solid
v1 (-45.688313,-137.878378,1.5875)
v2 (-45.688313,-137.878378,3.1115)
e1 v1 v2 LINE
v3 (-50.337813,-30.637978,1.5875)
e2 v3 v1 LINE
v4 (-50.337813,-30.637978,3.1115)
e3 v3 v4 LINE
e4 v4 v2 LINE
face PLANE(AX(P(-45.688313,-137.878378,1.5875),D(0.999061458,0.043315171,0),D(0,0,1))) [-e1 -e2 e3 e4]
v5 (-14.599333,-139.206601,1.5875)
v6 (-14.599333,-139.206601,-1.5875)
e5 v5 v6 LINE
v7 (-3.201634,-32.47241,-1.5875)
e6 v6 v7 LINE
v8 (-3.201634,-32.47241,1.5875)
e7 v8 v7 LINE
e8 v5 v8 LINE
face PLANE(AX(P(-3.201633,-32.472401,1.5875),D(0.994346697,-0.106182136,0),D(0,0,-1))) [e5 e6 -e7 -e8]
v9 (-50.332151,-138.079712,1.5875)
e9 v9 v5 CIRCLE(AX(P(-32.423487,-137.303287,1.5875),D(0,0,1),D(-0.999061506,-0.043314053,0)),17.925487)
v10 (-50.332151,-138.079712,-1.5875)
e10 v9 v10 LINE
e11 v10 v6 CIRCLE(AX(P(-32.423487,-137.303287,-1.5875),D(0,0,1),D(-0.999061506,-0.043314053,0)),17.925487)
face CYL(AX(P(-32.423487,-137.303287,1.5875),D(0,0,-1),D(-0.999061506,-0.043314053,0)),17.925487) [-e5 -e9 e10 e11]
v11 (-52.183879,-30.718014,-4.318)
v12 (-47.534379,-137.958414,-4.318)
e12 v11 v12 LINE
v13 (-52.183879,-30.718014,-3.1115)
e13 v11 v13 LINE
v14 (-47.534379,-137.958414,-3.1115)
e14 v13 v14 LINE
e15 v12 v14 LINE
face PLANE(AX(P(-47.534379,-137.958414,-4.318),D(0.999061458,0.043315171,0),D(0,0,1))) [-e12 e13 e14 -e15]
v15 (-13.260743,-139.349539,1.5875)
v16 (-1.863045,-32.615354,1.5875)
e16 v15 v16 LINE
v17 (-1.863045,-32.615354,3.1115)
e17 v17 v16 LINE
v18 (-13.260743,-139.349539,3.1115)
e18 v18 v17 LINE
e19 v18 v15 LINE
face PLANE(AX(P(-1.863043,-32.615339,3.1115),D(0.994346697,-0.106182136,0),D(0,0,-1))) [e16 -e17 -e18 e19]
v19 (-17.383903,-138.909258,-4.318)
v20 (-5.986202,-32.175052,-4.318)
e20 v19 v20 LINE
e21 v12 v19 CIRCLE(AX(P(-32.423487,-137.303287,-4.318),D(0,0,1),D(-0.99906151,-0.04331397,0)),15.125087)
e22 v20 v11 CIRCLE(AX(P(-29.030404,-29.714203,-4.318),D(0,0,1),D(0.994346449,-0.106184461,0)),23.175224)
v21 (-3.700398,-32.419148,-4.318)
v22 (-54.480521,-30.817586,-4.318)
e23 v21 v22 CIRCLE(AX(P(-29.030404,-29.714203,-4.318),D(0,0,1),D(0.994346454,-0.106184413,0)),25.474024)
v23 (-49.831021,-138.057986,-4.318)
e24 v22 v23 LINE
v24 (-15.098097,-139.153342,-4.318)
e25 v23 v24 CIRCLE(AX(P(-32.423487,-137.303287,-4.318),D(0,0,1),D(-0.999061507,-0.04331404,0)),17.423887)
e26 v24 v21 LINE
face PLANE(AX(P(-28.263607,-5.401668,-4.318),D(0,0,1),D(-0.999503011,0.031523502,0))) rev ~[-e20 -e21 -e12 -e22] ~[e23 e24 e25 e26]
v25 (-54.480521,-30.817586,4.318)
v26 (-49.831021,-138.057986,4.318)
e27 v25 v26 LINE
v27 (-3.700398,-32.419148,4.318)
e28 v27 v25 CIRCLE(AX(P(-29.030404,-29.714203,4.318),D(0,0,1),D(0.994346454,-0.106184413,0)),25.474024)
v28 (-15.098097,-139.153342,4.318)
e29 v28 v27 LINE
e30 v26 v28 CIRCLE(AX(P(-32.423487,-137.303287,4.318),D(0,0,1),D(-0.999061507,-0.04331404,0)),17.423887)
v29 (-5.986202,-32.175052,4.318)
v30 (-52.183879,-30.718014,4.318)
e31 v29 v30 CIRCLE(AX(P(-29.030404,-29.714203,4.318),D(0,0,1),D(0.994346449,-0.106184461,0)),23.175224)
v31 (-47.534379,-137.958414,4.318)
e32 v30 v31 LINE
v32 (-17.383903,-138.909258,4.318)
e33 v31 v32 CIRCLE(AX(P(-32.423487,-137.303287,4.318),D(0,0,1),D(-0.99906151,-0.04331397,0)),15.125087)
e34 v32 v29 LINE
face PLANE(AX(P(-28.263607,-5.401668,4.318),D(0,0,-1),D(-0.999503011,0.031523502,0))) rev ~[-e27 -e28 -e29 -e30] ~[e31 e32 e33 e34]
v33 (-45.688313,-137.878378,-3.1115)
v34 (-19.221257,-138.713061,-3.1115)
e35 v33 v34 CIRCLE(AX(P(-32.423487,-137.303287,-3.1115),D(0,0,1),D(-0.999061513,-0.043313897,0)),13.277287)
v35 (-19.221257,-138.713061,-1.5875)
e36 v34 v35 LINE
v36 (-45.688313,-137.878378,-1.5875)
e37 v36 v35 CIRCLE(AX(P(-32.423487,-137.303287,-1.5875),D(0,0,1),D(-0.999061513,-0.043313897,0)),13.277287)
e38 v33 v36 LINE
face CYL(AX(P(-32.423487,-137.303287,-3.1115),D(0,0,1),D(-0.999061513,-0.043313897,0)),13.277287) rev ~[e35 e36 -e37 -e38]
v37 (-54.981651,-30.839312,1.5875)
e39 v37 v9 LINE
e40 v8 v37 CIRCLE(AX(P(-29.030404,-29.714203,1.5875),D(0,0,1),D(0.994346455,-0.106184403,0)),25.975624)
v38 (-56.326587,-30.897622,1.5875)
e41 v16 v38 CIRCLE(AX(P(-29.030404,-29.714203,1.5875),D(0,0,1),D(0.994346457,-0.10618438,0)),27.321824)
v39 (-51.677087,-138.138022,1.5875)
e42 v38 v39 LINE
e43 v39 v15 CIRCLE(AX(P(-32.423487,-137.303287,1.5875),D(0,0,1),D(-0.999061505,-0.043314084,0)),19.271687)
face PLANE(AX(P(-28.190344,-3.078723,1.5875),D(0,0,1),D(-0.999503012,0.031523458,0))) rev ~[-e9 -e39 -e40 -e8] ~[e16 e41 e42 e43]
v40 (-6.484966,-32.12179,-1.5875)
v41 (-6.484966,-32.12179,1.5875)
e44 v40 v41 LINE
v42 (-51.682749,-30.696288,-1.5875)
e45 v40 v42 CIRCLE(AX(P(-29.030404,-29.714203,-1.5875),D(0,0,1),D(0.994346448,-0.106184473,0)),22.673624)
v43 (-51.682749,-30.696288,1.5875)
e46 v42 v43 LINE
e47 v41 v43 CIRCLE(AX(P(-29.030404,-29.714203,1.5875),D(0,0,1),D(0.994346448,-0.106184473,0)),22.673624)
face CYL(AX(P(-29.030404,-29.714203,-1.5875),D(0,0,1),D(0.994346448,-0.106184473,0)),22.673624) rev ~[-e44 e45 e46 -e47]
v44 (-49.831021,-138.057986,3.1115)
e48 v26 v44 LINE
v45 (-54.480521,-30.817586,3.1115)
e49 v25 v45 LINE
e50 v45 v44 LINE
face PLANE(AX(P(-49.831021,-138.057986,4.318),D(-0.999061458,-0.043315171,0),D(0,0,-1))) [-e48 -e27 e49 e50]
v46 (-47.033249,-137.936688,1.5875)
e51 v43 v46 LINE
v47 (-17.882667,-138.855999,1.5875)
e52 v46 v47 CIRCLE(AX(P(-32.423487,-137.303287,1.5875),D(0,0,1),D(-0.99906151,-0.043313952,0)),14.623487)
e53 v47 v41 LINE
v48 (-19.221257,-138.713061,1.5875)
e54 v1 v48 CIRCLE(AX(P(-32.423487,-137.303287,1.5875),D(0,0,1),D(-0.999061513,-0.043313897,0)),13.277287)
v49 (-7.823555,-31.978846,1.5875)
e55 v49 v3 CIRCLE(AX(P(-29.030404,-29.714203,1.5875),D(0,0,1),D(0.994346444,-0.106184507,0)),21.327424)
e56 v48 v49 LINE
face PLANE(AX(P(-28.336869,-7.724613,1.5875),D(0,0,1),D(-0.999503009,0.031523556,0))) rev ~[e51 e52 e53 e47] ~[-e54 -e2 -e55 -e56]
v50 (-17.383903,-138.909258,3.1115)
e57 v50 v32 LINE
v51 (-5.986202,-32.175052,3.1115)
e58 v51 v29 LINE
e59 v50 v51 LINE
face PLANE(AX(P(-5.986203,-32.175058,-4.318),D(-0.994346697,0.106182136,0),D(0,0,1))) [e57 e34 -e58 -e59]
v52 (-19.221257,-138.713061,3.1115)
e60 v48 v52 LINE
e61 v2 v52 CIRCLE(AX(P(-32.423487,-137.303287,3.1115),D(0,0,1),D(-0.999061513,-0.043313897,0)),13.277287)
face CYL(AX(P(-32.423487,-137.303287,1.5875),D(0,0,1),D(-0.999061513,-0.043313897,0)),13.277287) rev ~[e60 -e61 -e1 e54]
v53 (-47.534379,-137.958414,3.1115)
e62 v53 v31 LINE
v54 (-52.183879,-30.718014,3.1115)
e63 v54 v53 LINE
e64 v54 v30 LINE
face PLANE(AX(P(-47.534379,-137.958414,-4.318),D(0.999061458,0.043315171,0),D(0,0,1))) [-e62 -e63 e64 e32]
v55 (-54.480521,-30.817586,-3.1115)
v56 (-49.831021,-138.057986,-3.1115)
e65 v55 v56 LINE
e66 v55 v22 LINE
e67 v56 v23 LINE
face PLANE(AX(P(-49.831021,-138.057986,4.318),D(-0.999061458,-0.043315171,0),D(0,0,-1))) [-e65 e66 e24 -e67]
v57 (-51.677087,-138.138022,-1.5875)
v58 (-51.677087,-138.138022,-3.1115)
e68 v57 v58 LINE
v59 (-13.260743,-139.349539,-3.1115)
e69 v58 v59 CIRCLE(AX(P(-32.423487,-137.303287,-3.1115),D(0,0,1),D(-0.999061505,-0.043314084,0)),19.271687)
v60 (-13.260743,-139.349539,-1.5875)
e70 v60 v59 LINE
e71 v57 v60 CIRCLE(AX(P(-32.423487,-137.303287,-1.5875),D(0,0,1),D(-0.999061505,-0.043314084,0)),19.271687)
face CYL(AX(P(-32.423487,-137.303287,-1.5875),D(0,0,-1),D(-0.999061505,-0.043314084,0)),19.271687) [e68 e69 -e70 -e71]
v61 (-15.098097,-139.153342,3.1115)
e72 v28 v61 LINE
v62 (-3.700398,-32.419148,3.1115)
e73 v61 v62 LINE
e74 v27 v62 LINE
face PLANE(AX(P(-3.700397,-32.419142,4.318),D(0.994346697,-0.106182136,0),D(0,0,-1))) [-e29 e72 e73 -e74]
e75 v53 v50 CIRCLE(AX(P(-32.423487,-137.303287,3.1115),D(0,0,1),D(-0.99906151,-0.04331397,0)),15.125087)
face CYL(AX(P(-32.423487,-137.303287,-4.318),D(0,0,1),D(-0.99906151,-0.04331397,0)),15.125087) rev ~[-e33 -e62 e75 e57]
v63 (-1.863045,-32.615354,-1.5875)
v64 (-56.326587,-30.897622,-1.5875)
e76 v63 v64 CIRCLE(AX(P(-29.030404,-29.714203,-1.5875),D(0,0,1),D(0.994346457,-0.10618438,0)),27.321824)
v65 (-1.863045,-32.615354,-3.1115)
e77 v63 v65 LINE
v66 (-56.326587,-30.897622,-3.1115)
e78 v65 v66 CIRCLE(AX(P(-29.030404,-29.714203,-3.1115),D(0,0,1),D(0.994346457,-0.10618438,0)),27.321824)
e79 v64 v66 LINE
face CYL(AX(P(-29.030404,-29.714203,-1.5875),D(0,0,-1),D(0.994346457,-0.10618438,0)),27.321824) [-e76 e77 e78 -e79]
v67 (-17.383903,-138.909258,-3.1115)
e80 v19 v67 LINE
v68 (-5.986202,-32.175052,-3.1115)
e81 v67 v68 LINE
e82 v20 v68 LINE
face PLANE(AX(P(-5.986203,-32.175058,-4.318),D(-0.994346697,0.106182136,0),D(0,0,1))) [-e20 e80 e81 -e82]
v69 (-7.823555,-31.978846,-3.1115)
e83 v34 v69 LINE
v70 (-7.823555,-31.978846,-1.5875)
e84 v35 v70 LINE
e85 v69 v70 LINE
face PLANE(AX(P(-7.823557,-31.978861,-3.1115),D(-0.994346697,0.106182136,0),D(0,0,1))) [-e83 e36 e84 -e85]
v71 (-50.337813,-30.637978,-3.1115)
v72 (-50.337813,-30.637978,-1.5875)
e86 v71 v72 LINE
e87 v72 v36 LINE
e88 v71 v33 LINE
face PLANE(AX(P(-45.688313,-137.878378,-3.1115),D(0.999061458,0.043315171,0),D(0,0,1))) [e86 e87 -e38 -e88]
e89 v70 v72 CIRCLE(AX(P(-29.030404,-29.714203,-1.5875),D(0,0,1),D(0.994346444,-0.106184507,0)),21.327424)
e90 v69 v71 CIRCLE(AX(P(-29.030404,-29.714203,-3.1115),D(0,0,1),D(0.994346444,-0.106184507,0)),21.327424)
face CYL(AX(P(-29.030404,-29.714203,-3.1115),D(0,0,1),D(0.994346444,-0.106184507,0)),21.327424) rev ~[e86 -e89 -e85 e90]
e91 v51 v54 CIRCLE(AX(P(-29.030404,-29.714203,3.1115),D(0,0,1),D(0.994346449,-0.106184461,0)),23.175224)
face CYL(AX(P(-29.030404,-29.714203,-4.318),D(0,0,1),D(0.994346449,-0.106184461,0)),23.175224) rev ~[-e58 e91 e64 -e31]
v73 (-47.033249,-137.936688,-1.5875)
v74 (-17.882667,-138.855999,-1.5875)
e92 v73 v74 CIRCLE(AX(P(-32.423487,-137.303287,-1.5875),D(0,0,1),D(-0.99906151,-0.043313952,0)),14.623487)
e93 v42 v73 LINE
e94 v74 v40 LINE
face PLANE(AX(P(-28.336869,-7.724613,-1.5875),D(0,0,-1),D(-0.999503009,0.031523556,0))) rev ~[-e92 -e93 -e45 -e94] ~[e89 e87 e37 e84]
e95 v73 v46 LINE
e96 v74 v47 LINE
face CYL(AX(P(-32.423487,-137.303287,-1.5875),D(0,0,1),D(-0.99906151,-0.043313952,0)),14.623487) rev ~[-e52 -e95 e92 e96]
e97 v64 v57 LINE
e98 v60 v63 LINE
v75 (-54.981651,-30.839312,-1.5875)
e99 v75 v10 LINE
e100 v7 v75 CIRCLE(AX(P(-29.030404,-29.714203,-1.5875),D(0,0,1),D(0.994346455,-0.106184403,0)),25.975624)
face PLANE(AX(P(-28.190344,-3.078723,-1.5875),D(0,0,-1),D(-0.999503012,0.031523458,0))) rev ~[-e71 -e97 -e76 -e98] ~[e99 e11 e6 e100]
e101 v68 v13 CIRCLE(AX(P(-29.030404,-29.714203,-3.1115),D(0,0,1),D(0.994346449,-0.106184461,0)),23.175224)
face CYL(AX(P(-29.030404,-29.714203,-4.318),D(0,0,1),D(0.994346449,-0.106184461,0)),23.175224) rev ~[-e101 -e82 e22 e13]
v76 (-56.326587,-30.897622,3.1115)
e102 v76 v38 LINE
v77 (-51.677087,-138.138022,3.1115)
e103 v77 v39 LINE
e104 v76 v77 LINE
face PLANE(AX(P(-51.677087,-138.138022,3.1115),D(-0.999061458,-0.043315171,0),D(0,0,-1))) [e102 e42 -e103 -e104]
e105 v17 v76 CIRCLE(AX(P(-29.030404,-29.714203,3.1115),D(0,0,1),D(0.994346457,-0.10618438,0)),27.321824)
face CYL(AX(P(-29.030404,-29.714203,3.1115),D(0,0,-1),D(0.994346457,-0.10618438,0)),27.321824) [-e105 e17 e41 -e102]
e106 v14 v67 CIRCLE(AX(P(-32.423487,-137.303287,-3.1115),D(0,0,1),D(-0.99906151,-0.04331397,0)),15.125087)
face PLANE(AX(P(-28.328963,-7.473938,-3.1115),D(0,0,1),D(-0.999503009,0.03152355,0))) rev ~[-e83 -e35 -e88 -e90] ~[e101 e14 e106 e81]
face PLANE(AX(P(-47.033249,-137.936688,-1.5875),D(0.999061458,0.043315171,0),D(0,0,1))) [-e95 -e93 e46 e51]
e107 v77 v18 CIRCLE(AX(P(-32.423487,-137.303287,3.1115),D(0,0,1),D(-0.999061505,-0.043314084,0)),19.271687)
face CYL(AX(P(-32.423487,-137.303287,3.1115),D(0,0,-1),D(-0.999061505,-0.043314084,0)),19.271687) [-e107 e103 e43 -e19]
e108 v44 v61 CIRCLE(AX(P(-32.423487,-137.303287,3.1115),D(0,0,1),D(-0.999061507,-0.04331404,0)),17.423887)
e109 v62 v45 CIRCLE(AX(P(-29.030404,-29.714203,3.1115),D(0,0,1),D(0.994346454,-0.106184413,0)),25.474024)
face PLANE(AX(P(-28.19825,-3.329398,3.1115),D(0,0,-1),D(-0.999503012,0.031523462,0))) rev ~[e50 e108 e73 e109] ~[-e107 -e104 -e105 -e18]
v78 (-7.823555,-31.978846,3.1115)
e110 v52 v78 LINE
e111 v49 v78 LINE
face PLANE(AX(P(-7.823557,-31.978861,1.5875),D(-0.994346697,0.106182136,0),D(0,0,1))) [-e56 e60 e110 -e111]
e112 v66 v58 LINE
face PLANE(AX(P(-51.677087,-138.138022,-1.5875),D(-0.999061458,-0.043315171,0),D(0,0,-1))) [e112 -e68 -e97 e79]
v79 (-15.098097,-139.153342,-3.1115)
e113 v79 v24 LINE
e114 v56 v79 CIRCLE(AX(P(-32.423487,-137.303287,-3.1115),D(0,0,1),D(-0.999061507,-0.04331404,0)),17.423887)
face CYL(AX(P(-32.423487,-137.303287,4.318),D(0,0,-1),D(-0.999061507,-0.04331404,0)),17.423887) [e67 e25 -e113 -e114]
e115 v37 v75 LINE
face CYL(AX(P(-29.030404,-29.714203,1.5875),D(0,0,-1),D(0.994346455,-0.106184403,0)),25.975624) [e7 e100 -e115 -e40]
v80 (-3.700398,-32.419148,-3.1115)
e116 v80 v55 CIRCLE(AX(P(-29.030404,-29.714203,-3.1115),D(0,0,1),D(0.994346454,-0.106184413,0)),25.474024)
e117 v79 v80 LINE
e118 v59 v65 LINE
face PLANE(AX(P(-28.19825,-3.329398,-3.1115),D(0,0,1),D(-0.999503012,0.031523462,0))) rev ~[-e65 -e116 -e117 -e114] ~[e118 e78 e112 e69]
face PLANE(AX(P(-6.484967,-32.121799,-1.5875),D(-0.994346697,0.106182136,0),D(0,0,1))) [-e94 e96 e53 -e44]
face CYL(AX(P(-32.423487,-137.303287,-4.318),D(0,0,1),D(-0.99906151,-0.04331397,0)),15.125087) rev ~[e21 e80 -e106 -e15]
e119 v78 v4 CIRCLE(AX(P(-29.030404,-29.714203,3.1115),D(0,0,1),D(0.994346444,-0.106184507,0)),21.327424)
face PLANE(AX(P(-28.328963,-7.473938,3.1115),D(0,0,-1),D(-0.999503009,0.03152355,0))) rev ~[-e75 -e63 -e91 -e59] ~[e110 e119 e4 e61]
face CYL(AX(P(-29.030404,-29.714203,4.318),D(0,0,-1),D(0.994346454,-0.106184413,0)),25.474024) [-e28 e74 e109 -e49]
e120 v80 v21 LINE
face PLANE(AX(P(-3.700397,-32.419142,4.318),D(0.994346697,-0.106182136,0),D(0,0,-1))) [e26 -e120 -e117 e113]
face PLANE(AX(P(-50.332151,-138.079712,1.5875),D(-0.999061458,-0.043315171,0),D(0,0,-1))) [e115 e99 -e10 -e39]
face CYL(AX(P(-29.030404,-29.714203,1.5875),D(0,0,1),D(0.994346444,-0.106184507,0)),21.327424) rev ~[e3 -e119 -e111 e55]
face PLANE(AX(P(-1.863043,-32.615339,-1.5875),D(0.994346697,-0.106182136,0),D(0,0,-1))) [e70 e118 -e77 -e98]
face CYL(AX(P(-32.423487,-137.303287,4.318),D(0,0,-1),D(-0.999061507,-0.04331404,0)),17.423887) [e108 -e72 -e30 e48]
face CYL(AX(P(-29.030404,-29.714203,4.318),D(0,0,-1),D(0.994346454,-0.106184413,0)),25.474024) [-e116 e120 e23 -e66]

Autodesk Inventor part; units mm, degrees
ref_plane "РабПлоскость2" through (-29.0304, -29.7142, 0) normal (-1, 0, 0) x (0, 0, 1)
ref_plane "РабПлоскость3" through (-32.4235, -137.3033, 0) normal (0.367917, 0.9298586, 0) x (0, 0, 1)
sketch "Траектория" plane through (0, 0, 0) normal (0, 0, 1) x (1, 0, 0)
  arc A0 (-4.8433, -32.2971) -> (-53.3322, -30.7678) centre (-29.0304, -29.7142) ccw
  arc A1 (-48.6827, -138.0082) -> (-16.241, -139.0313) centre (-32.4235, -137.3033) ccw
  line L0 (-48.6827, -138.0082) -> (-53.3322, -30.7678)
  line L1 (-4.8433, -32.2971) -> (-16.241, -139.0313)
ref_plane "Секущая плоскость" through (-53.3322, -30.7678, 0) normal (0.0433145, -0.9990615, 0) x (0, 0, 1)
sketch "Эскиз сечения" plane through (-53.3322, -30.7678, 0) normal (0.0433145, -0.9990615, 0) x (0, 0, 1)
  line L0 (-4.318, -1.1494) -> (4.318, -1.1494)
  line L1 (4.318, -1.1494) -> (4.318, 1.1494)
  line L2 (4.318, 1.1494) -> (-4.318, 1.1494)
  line L3 (-4.318, 1.1494) -> (-4.318, -1.1494)
  line L4 (-1.5875, -1.651) -> (1.5875, -1.651)
  line L5 (1.5875, -1.651) -> (1.5875, 1.651)
  line L6 (1.5875, 1.651) -> (-1.5875, 1.651)
  line L7 (-1.5875, 1.651) -> (-1.5875, -1.651)
  line L8 (-1.5875, 0) -> (1.5875, 0) construction
  line L9 (-3.1115, -2.9972) -> (-1.5875, -2.9972)
  line L10 (-1.5875, -2.9972) -> (-1.5875, 2.9972)
  line L11 (-1.5875, 2.9972) -> (-3.1115, 2.9972)
  line L12 (-3.1115, 2.9972) -> (-3.1115, -2.9972)
  line L13 (1.5875, -2.9972) -> (3.1115, -2.9972)
  line L14 (3.1115, -2.9972) -> (3.1115, 2.9972)
  line L15 (3.1115, 2.9972) -> (1.5875, 2.9972)
  line L16 (1.5875, 2.9972) -> (1.5875, -2.9972)
  line L17 (-4.318, 0) -> (4.318, 0) construction
  point P0 (0, 0)
  point P1 (0, 0)
  dimension "d21" = 2.2987
  dimension "d22" = 3.302
  dimension "d23" = 3.175
  dimension "d24" = 1.524
  dimension "d31" = 5.9944
  dimension "d32" = 8.636
sweep "Тело" add profiles "Эскиз сечения" path "Траектория"
pattern_of_one "Strand Pattern"
equation "\"d21\" = da_d2"
equation "\"d22\" = da_d1"
equation "\"d23\" = da_b1"
equation "\"d24\" = da_t1 + da_t2"
equation "\"d30\" = da_pt"
equation "\"da_p\" = 6.35"
equation "\"da_b1\" = 3.175"
equation "\"da_h2\" = 5.9944"
equation "\"da_h3\" = 5.207"
equation "\"da_d1\" = 3.302"
equation "\"da_d2\" = 2.2987"
equation "\"da_pt\" = 6.4008"
equation "\"da_b\" = 8.636"
equation "\"da_t1\" = 0.762"
equation "\"da_t2\" = 0.762"
properties part number "Цепь роликовая" material "Сталь, мягкая"
